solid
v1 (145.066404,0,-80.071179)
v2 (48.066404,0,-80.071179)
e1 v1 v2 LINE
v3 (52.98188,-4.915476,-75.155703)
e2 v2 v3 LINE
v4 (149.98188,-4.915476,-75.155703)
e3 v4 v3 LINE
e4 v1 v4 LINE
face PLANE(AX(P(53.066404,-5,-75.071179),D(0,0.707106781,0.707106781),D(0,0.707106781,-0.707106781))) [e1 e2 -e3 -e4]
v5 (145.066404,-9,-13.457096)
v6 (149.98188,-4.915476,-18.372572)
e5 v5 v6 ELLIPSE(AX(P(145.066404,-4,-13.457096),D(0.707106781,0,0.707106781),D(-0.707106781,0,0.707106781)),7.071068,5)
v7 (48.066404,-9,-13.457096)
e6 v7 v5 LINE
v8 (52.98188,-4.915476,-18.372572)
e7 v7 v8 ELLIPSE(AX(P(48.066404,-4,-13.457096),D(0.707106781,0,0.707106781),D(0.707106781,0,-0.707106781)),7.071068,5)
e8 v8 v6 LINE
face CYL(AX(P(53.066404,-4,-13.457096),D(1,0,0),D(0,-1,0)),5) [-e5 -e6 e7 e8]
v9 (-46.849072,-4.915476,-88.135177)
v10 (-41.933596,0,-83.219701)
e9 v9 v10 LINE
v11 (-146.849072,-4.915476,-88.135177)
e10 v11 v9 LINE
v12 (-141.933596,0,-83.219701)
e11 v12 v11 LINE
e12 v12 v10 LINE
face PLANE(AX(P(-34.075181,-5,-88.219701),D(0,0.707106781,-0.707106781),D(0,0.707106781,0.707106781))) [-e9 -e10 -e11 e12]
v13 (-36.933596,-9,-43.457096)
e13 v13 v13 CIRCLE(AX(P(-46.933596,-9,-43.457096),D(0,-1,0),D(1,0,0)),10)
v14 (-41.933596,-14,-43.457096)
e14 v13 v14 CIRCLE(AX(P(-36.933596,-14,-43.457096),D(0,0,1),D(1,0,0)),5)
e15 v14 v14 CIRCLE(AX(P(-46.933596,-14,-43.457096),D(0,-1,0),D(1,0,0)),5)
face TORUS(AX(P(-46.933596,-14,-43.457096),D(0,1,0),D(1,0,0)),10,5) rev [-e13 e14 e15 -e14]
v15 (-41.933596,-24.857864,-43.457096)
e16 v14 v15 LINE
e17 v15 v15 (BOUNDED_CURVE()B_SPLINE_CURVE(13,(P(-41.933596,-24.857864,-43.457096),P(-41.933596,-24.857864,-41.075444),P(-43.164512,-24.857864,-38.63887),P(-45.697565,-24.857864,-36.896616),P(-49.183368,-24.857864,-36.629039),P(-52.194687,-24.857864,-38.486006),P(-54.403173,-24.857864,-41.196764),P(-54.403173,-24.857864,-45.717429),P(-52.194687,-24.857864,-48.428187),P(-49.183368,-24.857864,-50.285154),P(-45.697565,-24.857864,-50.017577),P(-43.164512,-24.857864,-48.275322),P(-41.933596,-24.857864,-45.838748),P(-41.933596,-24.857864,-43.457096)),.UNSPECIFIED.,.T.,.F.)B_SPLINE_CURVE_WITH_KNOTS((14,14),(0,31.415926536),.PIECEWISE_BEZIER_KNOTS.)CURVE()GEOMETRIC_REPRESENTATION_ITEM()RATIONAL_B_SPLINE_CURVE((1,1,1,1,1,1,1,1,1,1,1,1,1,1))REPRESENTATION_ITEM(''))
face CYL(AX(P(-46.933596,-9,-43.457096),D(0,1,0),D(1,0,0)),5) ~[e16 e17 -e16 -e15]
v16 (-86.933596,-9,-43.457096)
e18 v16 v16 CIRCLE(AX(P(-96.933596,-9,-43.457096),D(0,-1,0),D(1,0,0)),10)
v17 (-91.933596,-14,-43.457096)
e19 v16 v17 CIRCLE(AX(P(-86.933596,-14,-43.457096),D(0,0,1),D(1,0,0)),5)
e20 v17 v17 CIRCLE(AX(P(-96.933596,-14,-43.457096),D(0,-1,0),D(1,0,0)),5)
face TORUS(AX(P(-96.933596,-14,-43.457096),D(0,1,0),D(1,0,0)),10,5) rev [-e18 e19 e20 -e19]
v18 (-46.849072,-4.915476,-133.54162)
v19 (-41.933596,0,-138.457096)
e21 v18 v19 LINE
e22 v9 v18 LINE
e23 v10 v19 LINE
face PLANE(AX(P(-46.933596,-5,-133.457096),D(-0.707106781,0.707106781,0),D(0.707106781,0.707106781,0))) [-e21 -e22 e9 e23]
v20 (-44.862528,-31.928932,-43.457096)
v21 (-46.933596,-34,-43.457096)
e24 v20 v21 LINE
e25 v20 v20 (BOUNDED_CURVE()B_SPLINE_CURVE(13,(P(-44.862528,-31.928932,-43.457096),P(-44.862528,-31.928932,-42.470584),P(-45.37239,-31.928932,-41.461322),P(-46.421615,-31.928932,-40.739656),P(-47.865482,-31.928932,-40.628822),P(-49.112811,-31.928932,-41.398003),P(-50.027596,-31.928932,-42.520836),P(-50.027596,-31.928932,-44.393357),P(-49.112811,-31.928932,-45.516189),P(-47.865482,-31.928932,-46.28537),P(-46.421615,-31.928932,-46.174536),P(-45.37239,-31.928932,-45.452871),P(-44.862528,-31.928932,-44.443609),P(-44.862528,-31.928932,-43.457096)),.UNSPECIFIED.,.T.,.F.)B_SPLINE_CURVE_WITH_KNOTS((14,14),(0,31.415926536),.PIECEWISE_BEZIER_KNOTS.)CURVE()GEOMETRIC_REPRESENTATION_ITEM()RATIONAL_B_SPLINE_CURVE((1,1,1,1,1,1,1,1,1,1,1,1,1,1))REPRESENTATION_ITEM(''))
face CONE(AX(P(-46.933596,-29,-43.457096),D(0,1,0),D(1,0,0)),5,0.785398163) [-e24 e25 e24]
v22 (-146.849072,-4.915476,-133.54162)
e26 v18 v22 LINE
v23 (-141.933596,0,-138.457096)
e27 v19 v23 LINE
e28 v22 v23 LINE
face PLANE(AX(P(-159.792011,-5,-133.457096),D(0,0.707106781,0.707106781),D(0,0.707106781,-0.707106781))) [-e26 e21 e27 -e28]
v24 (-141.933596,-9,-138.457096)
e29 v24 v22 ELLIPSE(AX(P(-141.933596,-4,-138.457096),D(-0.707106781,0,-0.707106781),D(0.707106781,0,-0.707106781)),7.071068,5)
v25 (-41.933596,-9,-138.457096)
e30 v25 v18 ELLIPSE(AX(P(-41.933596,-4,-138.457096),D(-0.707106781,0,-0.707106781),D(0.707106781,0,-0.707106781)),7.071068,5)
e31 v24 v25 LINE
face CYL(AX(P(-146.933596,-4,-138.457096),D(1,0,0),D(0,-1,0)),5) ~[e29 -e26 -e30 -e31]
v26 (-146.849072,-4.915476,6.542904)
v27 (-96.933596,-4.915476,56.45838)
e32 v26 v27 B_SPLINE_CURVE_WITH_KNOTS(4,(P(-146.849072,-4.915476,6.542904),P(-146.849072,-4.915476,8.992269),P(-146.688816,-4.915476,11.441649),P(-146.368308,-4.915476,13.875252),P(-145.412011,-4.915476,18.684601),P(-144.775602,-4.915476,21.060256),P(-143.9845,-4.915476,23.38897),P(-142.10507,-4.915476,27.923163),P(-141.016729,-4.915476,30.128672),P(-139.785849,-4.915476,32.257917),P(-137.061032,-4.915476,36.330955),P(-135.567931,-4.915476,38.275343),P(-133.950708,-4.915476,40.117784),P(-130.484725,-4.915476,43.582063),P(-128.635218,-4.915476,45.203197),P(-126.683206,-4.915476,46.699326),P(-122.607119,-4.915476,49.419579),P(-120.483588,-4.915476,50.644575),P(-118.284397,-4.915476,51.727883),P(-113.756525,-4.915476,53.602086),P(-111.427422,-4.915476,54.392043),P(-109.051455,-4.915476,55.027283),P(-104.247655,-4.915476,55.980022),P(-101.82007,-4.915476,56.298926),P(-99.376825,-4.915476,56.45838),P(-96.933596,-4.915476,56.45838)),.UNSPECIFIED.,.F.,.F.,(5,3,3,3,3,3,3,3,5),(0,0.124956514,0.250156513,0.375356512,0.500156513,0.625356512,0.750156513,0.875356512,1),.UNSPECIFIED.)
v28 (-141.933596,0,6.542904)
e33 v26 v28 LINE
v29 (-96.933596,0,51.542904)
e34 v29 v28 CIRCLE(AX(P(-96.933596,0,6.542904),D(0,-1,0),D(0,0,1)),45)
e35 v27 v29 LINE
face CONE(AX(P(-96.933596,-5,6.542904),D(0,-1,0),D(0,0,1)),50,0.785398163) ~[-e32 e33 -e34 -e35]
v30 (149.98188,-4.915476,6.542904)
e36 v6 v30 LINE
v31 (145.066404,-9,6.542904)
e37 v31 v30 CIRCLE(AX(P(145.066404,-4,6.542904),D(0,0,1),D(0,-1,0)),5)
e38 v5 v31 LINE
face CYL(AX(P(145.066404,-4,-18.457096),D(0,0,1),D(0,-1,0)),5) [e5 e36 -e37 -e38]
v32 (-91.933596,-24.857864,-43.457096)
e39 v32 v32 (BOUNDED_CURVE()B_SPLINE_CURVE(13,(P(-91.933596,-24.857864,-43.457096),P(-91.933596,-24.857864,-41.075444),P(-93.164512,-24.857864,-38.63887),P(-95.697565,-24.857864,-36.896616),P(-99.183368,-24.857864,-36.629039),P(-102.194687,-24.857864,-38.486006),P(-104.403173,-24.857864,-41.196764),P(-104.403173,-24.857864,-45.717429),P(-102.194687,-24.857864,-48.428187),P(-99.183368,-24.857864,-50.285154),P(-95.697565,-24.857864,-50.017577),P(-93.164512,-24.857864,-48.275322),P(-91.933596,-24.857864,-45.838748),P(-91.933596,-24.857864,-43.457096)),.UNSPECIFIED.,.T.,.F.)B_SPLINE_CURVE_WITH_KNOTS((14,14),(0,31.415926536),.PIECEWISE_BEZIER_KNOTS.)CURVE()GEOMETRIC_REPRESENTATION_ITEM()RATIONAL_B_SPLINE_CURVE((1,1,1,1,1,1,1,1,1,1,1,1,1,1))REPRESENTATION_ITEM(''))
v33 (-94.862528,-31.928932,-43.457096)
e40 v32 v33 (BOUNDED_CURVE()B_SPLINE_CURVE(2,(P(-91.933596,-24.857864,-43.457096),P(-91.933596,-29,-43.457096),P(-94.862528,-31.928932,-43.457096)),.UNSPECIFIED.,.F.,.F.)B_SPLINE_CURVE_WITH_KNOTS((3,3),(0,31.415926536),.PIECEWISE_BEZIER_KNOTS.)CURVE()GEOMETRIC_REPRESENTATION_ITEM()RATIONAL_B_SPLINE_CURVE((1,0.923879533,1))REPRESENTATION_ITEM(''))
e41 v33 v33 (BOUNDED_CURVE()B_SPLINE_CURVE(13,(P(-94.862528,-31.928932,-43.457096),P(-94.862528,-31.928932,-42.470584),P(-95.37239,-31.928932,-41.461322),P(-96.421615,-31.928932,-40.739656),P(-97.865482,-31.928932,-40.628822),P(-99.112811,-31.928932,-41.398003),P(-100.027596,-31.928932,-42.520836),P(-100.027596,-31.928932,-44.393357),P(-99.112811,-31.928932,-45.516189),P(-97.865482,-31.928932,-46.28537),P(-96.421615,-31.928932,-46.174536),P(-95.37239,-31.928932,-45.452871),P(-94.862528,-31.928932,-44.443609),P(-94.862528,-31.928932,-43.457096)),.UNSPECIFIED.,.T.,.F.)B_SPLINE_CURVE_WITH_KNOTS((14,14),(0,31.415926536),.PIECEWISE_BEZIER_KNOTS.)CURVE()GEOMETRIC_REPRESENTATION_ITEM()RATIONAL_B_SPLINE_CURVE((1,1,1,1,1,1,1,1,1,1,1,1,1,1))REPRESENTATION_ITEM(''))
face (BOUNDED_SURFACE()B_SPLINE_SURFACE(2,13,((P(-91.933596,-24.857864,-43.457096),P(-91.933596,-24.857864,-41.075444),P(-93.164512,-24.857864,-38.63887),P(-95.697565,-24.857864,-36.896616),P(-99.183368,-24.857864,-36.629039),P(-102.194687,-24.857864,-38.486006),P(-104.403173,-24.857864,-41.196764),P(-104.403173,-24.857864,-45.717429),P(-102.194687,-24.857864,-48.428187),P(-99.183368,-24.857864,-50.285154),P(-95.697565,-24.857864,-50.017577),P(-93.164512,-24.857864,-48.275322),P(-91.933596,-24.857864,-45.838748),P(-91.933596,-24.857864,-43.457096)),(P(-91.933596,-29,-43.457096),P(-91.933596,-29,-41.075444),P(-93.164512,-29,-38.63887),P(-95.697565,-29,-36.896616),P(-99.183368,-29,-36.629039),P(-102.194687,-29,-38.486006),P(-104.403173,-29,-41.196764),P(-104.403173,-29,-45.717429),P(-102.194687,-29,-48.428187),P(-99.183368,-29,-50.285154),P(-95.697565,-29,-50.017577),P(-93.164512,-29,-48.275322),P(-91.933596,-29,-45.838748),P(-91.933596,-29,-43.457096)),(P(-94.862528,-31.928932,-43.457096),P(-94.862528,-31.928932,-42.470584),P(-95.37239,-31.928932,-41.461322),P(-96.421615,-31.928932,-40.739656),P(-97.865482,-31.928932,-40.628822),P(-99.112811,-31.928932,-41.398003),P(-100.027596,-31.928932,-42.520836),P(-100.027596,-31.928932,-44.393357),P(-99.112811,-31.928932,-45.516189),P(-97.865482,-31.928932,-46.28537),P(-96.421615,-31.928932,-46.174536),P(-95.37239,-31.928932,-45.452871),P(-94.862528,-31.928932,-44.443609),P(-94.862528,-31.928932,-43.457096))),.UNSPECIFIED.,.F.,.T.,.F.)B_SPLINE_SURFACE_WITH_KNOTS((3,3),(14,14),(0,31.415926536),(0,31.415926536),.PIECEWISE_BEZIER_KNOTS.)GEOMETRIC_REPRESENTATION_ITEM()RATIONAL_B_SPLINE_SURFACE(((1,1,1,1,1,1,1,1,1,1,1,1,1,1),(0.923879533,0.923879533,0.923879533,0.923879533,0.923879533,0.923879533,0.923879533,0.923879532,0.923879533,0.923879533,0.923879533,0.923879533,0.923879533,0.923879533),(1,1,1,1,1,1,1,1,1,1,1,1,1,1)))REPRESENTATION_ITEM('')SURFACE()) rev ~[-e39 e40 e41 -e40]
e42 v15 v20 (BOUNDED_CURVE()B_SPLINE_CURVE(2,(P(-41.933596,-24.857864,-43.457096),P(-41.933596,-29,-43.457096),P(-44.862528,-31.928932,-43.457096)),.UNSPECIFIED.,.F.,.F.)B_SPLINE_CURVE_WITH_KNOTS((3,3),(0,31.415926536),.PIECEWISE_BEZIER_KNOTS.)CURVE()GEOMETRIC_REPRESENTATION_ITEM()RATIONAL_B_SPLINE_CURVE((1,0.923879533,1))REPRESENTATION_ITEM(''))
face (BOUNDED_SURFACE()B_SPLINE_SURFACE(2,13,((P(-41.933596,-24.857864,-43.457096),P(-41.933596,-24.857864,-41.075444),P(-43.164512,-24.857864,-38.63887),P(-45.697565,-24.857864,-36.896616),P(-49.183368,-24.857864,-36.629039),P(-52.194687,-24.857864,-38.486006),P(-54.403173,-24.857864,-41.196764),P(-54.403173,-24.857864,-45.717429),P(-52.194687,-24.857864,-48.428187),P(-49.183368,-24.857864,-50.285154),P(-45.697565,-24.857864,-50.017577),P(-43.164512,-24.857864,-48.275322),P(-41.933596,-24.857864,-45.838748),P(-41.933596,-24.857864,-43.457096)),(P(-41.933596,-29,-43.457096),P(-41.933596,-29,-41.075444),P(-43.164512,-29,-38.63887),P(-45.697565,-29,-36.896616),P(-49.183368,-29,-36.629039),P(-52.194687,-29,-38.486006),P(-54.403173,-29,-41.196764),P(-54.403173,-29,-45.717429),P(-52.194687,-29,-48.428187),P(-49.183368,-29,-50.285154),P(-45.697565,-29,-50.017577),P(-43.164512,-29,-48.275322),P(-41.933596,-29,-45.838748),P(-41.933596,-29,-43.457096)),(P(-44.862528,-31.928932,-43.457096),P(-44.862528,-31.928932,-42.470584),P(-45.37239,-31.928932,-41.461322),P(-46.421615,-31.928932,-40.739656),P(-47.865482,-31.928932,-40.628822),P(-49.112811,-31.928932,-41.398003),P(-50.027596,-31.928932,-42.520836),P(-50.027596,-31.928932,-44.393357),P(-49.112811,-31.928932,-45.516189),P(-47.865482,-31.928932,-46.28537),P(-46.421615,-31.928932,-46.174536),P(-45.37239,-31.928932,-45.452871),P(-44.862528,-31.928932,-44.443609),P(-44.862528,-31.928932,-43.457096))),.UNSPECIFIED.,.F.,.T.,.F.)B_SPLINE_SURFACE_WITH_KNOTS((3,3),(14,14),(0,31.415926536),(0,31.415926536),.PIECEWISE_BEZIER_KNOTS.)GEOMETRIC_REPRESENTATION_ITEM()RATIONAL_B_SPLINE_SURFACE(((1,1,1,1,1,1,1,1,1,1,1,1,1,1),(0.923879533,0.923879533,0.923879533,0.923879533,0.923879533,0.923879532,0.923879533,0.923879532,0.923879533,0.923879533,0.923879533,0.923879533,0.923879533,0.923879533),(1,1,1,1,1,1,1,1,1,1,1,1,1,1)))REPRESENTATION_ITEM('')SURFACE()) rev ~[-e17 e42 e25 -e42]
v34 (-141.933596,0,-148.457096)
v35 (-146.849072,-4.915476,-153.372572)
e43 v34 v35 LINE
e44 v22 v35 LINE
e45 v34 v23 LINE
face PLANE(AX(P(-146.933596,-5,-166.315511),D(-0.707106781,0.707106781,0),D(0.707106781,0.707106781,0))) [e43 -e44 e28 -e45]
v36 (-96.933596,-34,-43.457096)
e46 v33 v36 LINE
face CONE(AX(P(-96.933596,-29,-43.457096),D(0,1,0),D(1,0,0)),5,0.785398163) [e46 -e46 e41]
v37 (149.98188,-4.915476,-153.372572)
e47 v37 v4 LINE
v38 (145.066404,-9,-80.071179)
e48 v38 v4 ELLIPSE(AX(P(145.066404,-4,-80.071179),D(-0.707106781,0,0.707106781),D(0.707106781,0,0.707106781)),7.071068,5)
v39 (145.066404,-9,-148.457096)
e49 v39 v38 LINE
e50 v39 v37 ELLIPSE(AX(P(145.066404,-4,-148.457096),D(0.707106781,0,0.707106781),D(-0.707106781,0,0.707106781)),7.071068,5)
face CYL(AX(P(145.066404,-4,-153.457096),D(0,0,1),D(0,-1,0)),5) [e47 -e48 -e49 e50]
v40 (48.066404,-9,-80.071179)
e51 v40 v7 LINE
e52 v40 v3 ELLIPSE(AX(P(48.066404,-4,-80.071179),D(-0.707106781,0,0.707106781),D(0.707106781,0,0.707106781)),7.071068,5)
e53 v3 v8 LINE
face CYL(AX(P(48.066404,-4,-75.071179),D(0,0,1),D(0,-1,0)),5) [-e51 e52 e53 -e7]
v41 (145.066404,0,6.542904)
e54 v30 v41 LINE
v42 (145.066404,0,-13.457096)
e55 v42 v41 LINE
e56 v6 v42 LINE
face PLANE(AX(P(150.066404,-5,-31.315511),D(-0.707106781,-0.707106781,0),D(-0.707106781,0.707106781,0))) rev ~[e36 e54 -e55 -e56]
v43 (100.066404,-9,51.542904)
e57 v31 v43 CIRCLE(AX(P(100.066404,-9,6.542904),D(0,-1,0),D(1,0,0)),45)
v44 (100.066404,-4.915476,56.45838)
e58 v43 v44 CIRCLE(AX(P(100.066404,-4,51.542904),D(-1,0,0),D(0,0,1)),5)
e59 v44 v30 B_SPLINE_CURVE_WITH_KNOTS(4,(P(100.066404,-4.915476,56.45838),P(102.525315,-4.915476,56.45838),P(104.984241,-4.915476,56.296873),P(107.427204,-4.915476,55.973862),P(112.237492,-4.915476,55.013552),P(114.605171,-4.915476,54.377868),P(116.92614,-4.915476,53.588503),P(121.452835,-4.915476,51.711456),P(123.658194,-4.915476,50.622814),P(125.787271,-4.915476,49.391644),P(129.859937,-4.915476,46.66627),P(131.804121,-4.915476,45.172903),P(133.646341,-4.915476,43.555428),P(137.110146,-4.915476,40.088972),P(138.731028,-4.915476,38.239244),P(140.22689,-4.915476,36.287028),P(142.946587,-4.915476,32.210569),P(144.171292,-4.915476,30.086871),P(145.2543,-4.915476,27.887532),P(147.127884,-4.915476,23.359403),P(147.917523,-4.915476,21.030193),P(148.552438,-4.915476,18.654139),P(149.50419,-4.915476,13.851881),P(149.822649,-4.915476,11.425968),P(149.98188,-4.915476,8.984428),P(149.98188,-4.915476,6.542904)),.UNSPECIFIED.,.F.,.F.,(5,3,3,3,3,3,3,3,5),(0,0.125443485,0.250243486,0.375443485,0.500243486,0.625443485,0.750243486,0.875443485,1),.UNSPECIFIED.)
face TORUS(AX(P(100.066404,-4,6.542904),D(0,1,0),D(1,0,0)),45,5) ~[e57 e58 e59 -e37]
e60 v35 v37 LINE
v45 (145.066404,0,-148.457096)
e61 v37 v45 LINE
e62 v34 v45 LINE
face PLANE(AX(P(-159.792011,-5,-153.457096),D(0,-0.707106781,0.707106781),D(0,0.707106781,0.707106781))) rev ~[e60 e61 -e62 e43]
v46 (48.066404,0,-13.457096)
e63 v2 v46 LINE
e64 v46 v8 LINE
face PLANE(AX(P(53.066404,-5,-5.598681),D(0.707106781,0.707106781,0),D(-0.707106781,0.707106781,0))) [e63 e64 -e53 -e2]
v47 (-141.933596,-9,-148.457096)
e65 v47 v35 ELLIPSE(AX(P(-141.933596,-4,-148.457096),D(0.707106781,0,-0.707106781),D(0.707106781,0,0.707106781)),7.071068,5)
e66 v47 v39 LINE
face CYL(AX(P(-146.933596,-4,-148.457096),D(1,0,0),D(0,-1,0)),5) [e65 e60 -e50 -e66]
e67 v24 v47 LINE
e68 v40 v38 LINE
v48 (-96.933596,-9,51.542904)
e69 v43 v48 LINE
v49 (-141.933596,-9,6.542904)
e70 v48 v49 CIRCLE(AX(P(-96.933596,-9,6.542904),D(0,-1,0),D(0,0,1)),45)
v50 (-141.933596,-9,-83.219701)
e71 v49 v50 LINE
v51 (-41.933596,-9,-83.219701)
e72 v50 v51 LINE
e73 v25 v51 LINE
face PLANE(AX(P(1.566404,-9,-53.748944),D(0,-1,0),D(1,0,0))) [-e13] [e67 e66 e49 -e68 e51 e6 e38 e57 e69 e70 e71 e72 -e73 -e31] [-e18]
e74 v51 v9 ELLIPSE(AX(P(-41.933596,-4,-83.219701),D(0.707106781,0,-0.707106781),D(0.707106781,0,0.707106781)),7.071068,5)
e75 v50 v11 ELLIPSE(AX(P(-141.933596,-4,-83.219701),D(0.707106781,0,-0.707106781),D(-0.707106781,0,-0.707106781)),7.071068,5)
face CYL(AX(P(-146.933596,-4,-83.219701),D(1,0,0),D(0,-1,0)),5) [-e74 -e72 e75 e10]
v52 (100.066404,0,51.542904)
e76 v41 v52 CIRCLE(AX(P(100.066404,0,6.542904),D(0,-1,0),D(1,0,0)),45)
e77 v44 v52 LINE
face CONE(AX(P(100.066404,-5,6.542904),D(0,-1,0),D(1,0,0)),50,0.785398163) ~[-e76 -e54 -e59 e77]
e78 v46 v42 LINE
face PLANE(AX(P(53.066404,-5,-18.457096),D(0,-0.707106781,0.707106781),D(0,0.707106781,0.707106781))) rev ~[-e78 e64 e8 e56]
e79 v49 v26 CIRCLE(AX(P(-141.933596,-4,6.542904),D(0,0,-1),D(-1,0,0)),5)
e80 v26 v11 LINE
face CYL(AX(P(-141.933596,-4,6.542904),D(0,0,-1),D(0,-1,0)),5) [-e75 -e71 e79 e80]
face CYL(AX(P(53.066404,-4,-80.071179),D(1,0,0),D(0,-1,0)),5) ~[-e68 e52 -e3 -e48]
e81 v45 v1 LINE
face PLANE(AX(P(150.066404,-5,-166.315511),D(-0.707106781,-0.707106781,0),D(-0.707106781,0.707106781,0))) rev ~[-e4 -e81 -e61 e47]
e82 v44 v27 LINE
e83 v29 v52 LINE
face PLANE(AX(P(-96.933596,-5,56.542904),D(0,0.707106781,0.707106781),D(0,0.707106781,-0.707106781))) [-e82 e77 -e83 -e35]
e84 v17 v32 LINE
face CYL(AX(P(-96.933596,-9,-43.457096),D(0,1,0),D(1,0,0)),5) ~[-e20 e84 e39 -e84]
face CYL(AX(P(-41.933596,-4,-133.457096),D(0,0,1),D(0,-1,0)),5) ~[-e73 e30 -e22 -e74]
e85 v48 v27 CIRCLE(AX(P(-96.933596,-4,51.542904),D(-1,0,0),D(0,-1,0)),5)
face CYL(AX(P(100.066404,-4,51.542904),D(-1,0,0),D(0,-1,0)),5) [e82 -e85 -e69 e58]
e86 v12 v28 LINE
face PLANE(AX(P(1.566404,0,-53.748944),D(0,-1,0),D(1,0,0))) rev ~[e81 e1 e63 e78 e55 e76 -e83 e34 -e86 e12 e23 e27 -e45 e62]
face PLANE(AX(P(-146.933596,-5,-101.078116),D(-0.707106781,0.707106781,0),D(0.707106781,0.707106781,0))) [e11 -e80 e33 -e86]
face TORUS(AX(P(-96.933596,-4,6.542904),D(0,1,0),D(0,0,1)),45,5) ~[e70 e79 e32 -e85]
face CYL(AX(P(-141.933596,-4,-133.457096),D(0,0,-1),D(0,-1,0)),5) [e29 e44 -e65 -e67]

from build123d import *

# Parameters (mm, degrees)
F1_DEPTH      = 9
F2_R          = 5
F3_DEPTH      = 25
F4_W          = 103.9993347282
F4_H          = 56.6140824735
F5_DEPTH      = 25
F6_W          = 113.1558813547
F6_H          = 45.2373955332
F7_DEPTH      = 25
F8_R          = 5
F9_SIZE       = 5
F10_R         = 10
F11_T1_DEPTH  = 37.8584149398
F11_T3_DEPTH  = 109.8584149398
F11_T5_DEPTH  = 56.6140824735
F11_T7_DEPTH  = 104.1027474062
F11_T9_DEPTH  = 322.7168298797
F11_T11_DEPTH = 45.7168298797
F11_T13_DEPTH = 112.8584149398
F11_T15_DEPTH = 45.2373955332
F11_T17_DEPTH = 107.6210194067
F11_T19_DEPTH = 197
F11_T22_ANGLE = 90
F11_T24_ANGLE = 90
F11_T29_DEPTH = 122.7168298797
F11_T33_DEPTH = 69.4724974133
F11_T40_DEPTH = 69.4724974133
F11_T44_DEPTH = 122.7168298797
F11_T51_DEPTH = 58.095810473
F11_T55_DEPTH = 125.7168298797
F11_T62_DEPTH = 125.7168298797
F11_T66_DEPTH = 58.095810473


# Not quite as in the source:
# - a fillet or chamfer that OpenCascade refuses, or shapes differently, is made with other operations: its cross-section is extruded or revolved along the edge and cut away or added


with BuildPart() as f1:
    # F0 (on Front) → F1 (new body)
    with BuildSketch(Plane.XZ):
        with BuildLine():
            Line((100.0664040952, 56.5429037459), (-96.9335959048, 56.5429037459))
            ThreePointArc((-96.9335959048, 56.5429037459), (-132.2889349642, 41.8982428052), (-146.9335959048, 6.5429037459))
            Line((-146.9335959048, 6.5429037459), (-146.9335959048, -153.4570962541))
            Line((-146.9335959048, -153.4570962541), (150.0664040952, -153.4570962541))
            Line((150.0664040952, -153.4570962541), (150.0664040952, 6.5429037459))
            ThreePointArc((150.0664040952, 6.5429037459), (135.4217431545, 41.8982428052), (100.0664040952, 56.5429037459))
        make_face()
    extrude(amount=F1_DEPTH)

    # F2 (on face) → F3 (join)
    with BuildSketch(Plane.XZ.offset(9)):
        with Locations((-46.9335959048, -43.4570962541)):
            Circle(F2_R)
        with Locations((-96.9335959048, -43.4570962541)):
            Circle(F2_R)
    extrude(amount=F3_DEPTH)

    # F4 (on face) → F5 (cut)
    with BuildSketch(Plane.XZ.offset(9)):
        with Locations((105.0660714593, -46.7641374908)):
            Rectangle(F4_W, F4_H)
    extrude(amount=-F5_DEPTH, mode=Mode.SUBTRACT)

    # F6 (on face) → F7 (cut)
    with BuildSketch(Plane.XZ.offset(9)):
        with Locations((-103.5115365822, -110.8383984875)):
            Rectangle(F6_W, F6_H)
    extrude(amount=-F7_DEPTH, mode=Mode.SUBTRACT)

    # F8
    f8_edges = [f1.edges().sort_by_distance(p)[0] for p in [
        (150.066404, -9, -5.957096),
        (101.566404, -9, -18.457096),
        (53.066404, -9, -46.764137),
        (101.566404, -9, -75.071179),
        (150.066404, -9, -114.264137),
        (1.566404, -9, -153.457096),
        (-146.933596, -9, -143.457096),
        (-96.933596, -9, -133.457096),
        (-46.933596, -9, -110.838398),
        (-96.933596, -9, -88.219701),
        (-146.933596, -9, -40.838398),
        (-132.288935, -9, 41.898243),
        (1.566404, -9, 56.542904),
        (135.421743, -9, 41.898243),
        (-101.933596, -9, -43.457096),
        (-51.933596, -9, -43.457096),
    ]]
    fillet(f8_edges, radius=F8_R)

    # F9
    f9_edges = [f1.edges().sort_by_distance(p)[0] for p in [
        (-101.933596, -34, -43.457096),
        (-51.933596, -34, -43.457096),
    ]]
    chamfer(f9_edges, length=F9_SIZE)

    # F10
    f10_edges = [f1.edges().sort_by_distance(p)[0] for p in [
        (-94.433596, -31.5, -43.457096),
        (-101.933596, -29, -43.457096),
        (-44.433596, -31.5, -43.457096),
        (-51.933596, -29, -43.457096),
    ]]
    fillet(f10_edges, radius=F10_R)

    # F11: chamfer of 5 on 14 edges, made by hand

    # F11_s2 → F11_t1 (cut)
    with BuildSketch(Plane.XY.offset(-31.3155111939)):
        Polygon((150.0664040952, -5), (145.0664040952, 0), (150.0664040952, 0), align=None)
    extrude(amount=F11_T1_DEPTH, mode=Mode.SUBTRACT)

    # F11_s4 → F11_t3 (cut)
    with BuildSketch(Plane.YZ.offset(53.0664040952)):
        Polygon((-5, -18.4570962541), (0, -13.4570962541), (0, -18.4570962541), align=None)
        Polygon((-5, -75.0711787276), (0, -80.0711787276), (0, -75.0711787276), align=None)
    extrude(amount=F11_T3_DEPTH, mode=Mode.SUBTRACT)

    # F11_s6 → F11_t5 (cut)
    with BuildSketch(Plane.XY.offset(-75.0711787276)):
        Polygon((53.0664040952, -5), (48.0664040952, 0), (53.0664040952, 0), align=None)
    extrude(amount=F11_T5_DEPTH, mode=Mode.SUBTRACT)

    # F11_s8 → F11_t7 (cut)
    with BuildSketch(Plane.XY.offset(-166.3155111939)):
        Polygon((150.0664040952, -5), (145.0664040952, 0), (150.0664040952, 0), align=None)
    extrude(amount=F11_T7_DEPTH, mode=Mode.SUBTRACT)

    # F11_s10 → F11_t9 (cut)
    with BuildSketch(Plane.YZ.offset(-159.7920108447)):
        Polygon((-5, -153.4570962541), (0, -148.4570962541), (0, -153.4570962541), align=None)
    extrude(amount=F11_T9_DEPTH, mode=Mode.SUBTRACT)

    # F11_s12 → F11_t11 (cut)
    with BuildSketch(Plane.XY.offset(-166.3155111939)):
        Polygon((-146.9335959048, -5), (-141.9335959048, 0), (-146.9335959048, 0), align=None)
    extrude(amount=F11_T11_DEPTH, mode=Mode.SUBTRACT)

    # F11_s14 → F11_t13 (cut)
    with BuildSketch(Plane.YZ.offset(-159.7920108447)):
        Polygon((-5, -133.4570962541), (0, -138.4570962541), (0, -133.4570962541), align=None)
        Polygon((-5, -88.2197007209), (0, -83.2197007209), (0, -88.2197007209), align=None)
    extrude(amount=F11_T13_DEPTH, mode=Mode.SUBTRACT)

    # F11_s16 → F11_t15 (cut)
    with BuildSketch(Plane.XY.offset(-133.4570962541)):
        Polygon((-46.9335959048, -5), (-41.9335959048, 0), (-46.9335959048, 0), align=None)
    extrude(amount=F11_T15_DEPTH, mode=Mode.SUBTRACT)

    # F11_s18 → F11_t17 (cut)
    with BuildSketch(Plane.XY.offset(-101.0781156608)):
        Polygon((-146.9335959048, -5), (-141.9335959048, 0), (-146.9335959048, 0), align=None)
    extrude(amount=F11_T17_DEPTH, mode=Mode.SUBTRACT)

    # F11_s20 → F11_t19 (cut)
    with BuildSketch(Plane.YZ.offset(-96.9335959048)):
        Polygon((-5, 56.5429037459), (0, 51.5429037459), (0, 56.5429037459), align=None)
    extrude(amount=F11_T19_DEPTH, mode=Mode.SUBTRACT)

    # F11_s21 → F11_t22 (revolve, cut)
    with BuildSketch(Plane.YZ.offset(-96.9335959048)):
        Polygon((-5, 56.5429037459), (0, 51.5429037459), (0, 56.5429037459), align=None)
    revolve(axis=Axis((-96.9335959048, 0, 6.5429037459), (0, -1, 0)), revolution_arc=F11_T22_ANGLE, mode=Mode.SUBTRACT)

    # F11_s23 → F11_t24 (revolve, cut)
    with BuildSketch(Plane.XY.offset(6.5429037459)):
        Polygon((150.0664040952, -5), (145.0664040952, 0), (150.0664040952, 0), align=None)
    revolve(axis=Axis((100.0664040952, 0, 6.5429037459), (0, -1, 0)), revolution_arc=F11_T24_ANGLE, mode=Mode.SUBTRACT)


with BuildPart() as f11_tool27:
    # F11_s28 → F11_t29 (new body)
    with BuildSketch(Plane.YZ.offset(162.924819035)):
        Polygon((-5, -18.4570962541), (0, -13.4570962541), (0, -18.4570962541), align=None)
    extrude(amount=-F11_T29_DEPTH)

    split(bisect_by=Plane.YZ.offset(53.0664040952), keep=Keep.BOTTOM)


with BuildPart() as f11_tool31:
    # F11_s32 → F11_t33 (new body)
    with BuildSketch(Plane.XY.offset(-5.5986813143)):
        Polygon((53.0664040952, -5), (48.0664040952, 0), (53.0664040952, 0), align=None)
    extrude(amount=-F11_T33_DEPTH)

    split(bisect_by=Plane.XY.offset(-18.4570962541), keep=Keep.TOP)


with BuildPart() as f11_tool27_1:
    add(f11_tool27.part)

    # F11_t35: intersect F11_tool31
    add(f11_tool31.part, mode=Mode.INTERSECT)


with BuildPart() as f1_1:
    add(f1.part)

    # F11_t25: cut F11_tool27
    add(f11_tool27_1.part, mode=Mode.SUBTRACT)


with BuildPart() as f11_tool38:
    # F11_s39 → F11_t40 (new body)
    with BuildSketch(Plane.XY.offset(-18.4570962541)):
        Polygon((53.0664040952, -5), (48.0664040952, 0), (53.0664040952, 0), align=None)
    extrude(amount=-F11_T40_DEPTH)

    split(bisect_by=Plane.XY.offset(-75.0711787276), keep=Keep.BOTTOM)


with BuildPart() as f11_tool42:
    # F11_s43 → F11_t44 (new body)
    with BuildSketch(Plane.YZ.offset(40.2079891553)):
        Polygon((-5, -75.0711787276), (0, -80.0711787276), (0, -75.0711787276), align=None)
    extrude(amount=F11_T44_DEPTH)

    split(bisect_by=Plane.YZ.offset(53.0664040952), keep=Keep.BOTTOM)


with BuildPart() as f11_tool38_1:
    add(f11_tool38.part)

    # F11_t46: intersect F11_tool42
    add(f11_tool42.part, mode=Mode.INTERSECT)


with BuildPart() as f1_2:
    add(f1_1.part)

    # F11_t36: cut F11_tool38
    add(f11_tool38_1.part, mode=Mode.SUBTRACT)


with BuildPart() as f11_tool49:
    # F11_s50 → F11_t51 (new body)
    with BuildSketch(Plane.XY.offset(-146.3155111939)):
        Polygon((-46.9335959048, -5), (-41.9335959048, 0), (-46.9335959048, 0), align=None)
    extrude(amount=F11_T51_DEPTH)

    split(bisect_by=Plane.XY.offset(-133.4570962541), keep=Keep.BOTTOM)


with BuildPart() as f11_tool53:
    # F11_s54 → F11_t55 (new body)
    with BuildSketch(Plane.YZ.offset(-159.7920108447)):
        Polygon((-5, -133.4570962541), (0, -138.4570962541), (0, -133.4570962541), align=None)
    extrude(amount=F11_T55_DEPTH)

    split(bisect_by=Plane.YZ.offset(-46.9335959048), keep=Keep.TOP)


with BuildPart() as f11_tool49_1:
    add(f11_tool49.part)

    # F11_t57: intersect F11_tool53
    add(f11_tool53.part, mode=Mode.INTERSECT)


with BuildPart() as f1_3:
    add(f1_2.part)

    # F11_t47: cut F11_tool49
    add(f11_tool49_1.part, mode=Mode.SUBTRACT)


with BuildPart() as f11_tool60:
    # F11_s61 → F11_t62 (new body)
    with BuildSketch(Plane.YZ.offset(-34.075180965)):
        Polygon((-5, -88.2197007209), (0, -83.2197007209), (0, -88.2197007209), align=None)
    extrude(amount=-F11_T62_DEPTH)

    split(bisect_by=Plane.YZ.offset(-46.9335959048), keep=Keep.TOP)


with BuildPart() as f11_tool64:
    # F11_s65 → F11_t66 (new body)
    with BuildSketch(Plane.XY.offset(-133.4570962541)):
        Polygon((-46.9335959048, -5), (-41.9335959048, 0), (-46.9335959048, 0), align=None)
    extrude(amount=F11_T66_DEPTH)

    split(bisect_by=Plane.XY.offset(-88.2197007209), keep=Keep.TOP)


with BuildPart() as f11_tool60_1:
    add(f11_tool60.part)

    # F11_t68: intersect F11_tool64
    add(f11_tool64.part, mode=Mode.INTERSECT)


with BuildPart() as f1_4:
    add(f1_3.part)

    # F11_t58: cut F11_tool60
    add(f11_tool60_1.part, mode=Mode.SUBTRACT)


solid = f1_4.part
